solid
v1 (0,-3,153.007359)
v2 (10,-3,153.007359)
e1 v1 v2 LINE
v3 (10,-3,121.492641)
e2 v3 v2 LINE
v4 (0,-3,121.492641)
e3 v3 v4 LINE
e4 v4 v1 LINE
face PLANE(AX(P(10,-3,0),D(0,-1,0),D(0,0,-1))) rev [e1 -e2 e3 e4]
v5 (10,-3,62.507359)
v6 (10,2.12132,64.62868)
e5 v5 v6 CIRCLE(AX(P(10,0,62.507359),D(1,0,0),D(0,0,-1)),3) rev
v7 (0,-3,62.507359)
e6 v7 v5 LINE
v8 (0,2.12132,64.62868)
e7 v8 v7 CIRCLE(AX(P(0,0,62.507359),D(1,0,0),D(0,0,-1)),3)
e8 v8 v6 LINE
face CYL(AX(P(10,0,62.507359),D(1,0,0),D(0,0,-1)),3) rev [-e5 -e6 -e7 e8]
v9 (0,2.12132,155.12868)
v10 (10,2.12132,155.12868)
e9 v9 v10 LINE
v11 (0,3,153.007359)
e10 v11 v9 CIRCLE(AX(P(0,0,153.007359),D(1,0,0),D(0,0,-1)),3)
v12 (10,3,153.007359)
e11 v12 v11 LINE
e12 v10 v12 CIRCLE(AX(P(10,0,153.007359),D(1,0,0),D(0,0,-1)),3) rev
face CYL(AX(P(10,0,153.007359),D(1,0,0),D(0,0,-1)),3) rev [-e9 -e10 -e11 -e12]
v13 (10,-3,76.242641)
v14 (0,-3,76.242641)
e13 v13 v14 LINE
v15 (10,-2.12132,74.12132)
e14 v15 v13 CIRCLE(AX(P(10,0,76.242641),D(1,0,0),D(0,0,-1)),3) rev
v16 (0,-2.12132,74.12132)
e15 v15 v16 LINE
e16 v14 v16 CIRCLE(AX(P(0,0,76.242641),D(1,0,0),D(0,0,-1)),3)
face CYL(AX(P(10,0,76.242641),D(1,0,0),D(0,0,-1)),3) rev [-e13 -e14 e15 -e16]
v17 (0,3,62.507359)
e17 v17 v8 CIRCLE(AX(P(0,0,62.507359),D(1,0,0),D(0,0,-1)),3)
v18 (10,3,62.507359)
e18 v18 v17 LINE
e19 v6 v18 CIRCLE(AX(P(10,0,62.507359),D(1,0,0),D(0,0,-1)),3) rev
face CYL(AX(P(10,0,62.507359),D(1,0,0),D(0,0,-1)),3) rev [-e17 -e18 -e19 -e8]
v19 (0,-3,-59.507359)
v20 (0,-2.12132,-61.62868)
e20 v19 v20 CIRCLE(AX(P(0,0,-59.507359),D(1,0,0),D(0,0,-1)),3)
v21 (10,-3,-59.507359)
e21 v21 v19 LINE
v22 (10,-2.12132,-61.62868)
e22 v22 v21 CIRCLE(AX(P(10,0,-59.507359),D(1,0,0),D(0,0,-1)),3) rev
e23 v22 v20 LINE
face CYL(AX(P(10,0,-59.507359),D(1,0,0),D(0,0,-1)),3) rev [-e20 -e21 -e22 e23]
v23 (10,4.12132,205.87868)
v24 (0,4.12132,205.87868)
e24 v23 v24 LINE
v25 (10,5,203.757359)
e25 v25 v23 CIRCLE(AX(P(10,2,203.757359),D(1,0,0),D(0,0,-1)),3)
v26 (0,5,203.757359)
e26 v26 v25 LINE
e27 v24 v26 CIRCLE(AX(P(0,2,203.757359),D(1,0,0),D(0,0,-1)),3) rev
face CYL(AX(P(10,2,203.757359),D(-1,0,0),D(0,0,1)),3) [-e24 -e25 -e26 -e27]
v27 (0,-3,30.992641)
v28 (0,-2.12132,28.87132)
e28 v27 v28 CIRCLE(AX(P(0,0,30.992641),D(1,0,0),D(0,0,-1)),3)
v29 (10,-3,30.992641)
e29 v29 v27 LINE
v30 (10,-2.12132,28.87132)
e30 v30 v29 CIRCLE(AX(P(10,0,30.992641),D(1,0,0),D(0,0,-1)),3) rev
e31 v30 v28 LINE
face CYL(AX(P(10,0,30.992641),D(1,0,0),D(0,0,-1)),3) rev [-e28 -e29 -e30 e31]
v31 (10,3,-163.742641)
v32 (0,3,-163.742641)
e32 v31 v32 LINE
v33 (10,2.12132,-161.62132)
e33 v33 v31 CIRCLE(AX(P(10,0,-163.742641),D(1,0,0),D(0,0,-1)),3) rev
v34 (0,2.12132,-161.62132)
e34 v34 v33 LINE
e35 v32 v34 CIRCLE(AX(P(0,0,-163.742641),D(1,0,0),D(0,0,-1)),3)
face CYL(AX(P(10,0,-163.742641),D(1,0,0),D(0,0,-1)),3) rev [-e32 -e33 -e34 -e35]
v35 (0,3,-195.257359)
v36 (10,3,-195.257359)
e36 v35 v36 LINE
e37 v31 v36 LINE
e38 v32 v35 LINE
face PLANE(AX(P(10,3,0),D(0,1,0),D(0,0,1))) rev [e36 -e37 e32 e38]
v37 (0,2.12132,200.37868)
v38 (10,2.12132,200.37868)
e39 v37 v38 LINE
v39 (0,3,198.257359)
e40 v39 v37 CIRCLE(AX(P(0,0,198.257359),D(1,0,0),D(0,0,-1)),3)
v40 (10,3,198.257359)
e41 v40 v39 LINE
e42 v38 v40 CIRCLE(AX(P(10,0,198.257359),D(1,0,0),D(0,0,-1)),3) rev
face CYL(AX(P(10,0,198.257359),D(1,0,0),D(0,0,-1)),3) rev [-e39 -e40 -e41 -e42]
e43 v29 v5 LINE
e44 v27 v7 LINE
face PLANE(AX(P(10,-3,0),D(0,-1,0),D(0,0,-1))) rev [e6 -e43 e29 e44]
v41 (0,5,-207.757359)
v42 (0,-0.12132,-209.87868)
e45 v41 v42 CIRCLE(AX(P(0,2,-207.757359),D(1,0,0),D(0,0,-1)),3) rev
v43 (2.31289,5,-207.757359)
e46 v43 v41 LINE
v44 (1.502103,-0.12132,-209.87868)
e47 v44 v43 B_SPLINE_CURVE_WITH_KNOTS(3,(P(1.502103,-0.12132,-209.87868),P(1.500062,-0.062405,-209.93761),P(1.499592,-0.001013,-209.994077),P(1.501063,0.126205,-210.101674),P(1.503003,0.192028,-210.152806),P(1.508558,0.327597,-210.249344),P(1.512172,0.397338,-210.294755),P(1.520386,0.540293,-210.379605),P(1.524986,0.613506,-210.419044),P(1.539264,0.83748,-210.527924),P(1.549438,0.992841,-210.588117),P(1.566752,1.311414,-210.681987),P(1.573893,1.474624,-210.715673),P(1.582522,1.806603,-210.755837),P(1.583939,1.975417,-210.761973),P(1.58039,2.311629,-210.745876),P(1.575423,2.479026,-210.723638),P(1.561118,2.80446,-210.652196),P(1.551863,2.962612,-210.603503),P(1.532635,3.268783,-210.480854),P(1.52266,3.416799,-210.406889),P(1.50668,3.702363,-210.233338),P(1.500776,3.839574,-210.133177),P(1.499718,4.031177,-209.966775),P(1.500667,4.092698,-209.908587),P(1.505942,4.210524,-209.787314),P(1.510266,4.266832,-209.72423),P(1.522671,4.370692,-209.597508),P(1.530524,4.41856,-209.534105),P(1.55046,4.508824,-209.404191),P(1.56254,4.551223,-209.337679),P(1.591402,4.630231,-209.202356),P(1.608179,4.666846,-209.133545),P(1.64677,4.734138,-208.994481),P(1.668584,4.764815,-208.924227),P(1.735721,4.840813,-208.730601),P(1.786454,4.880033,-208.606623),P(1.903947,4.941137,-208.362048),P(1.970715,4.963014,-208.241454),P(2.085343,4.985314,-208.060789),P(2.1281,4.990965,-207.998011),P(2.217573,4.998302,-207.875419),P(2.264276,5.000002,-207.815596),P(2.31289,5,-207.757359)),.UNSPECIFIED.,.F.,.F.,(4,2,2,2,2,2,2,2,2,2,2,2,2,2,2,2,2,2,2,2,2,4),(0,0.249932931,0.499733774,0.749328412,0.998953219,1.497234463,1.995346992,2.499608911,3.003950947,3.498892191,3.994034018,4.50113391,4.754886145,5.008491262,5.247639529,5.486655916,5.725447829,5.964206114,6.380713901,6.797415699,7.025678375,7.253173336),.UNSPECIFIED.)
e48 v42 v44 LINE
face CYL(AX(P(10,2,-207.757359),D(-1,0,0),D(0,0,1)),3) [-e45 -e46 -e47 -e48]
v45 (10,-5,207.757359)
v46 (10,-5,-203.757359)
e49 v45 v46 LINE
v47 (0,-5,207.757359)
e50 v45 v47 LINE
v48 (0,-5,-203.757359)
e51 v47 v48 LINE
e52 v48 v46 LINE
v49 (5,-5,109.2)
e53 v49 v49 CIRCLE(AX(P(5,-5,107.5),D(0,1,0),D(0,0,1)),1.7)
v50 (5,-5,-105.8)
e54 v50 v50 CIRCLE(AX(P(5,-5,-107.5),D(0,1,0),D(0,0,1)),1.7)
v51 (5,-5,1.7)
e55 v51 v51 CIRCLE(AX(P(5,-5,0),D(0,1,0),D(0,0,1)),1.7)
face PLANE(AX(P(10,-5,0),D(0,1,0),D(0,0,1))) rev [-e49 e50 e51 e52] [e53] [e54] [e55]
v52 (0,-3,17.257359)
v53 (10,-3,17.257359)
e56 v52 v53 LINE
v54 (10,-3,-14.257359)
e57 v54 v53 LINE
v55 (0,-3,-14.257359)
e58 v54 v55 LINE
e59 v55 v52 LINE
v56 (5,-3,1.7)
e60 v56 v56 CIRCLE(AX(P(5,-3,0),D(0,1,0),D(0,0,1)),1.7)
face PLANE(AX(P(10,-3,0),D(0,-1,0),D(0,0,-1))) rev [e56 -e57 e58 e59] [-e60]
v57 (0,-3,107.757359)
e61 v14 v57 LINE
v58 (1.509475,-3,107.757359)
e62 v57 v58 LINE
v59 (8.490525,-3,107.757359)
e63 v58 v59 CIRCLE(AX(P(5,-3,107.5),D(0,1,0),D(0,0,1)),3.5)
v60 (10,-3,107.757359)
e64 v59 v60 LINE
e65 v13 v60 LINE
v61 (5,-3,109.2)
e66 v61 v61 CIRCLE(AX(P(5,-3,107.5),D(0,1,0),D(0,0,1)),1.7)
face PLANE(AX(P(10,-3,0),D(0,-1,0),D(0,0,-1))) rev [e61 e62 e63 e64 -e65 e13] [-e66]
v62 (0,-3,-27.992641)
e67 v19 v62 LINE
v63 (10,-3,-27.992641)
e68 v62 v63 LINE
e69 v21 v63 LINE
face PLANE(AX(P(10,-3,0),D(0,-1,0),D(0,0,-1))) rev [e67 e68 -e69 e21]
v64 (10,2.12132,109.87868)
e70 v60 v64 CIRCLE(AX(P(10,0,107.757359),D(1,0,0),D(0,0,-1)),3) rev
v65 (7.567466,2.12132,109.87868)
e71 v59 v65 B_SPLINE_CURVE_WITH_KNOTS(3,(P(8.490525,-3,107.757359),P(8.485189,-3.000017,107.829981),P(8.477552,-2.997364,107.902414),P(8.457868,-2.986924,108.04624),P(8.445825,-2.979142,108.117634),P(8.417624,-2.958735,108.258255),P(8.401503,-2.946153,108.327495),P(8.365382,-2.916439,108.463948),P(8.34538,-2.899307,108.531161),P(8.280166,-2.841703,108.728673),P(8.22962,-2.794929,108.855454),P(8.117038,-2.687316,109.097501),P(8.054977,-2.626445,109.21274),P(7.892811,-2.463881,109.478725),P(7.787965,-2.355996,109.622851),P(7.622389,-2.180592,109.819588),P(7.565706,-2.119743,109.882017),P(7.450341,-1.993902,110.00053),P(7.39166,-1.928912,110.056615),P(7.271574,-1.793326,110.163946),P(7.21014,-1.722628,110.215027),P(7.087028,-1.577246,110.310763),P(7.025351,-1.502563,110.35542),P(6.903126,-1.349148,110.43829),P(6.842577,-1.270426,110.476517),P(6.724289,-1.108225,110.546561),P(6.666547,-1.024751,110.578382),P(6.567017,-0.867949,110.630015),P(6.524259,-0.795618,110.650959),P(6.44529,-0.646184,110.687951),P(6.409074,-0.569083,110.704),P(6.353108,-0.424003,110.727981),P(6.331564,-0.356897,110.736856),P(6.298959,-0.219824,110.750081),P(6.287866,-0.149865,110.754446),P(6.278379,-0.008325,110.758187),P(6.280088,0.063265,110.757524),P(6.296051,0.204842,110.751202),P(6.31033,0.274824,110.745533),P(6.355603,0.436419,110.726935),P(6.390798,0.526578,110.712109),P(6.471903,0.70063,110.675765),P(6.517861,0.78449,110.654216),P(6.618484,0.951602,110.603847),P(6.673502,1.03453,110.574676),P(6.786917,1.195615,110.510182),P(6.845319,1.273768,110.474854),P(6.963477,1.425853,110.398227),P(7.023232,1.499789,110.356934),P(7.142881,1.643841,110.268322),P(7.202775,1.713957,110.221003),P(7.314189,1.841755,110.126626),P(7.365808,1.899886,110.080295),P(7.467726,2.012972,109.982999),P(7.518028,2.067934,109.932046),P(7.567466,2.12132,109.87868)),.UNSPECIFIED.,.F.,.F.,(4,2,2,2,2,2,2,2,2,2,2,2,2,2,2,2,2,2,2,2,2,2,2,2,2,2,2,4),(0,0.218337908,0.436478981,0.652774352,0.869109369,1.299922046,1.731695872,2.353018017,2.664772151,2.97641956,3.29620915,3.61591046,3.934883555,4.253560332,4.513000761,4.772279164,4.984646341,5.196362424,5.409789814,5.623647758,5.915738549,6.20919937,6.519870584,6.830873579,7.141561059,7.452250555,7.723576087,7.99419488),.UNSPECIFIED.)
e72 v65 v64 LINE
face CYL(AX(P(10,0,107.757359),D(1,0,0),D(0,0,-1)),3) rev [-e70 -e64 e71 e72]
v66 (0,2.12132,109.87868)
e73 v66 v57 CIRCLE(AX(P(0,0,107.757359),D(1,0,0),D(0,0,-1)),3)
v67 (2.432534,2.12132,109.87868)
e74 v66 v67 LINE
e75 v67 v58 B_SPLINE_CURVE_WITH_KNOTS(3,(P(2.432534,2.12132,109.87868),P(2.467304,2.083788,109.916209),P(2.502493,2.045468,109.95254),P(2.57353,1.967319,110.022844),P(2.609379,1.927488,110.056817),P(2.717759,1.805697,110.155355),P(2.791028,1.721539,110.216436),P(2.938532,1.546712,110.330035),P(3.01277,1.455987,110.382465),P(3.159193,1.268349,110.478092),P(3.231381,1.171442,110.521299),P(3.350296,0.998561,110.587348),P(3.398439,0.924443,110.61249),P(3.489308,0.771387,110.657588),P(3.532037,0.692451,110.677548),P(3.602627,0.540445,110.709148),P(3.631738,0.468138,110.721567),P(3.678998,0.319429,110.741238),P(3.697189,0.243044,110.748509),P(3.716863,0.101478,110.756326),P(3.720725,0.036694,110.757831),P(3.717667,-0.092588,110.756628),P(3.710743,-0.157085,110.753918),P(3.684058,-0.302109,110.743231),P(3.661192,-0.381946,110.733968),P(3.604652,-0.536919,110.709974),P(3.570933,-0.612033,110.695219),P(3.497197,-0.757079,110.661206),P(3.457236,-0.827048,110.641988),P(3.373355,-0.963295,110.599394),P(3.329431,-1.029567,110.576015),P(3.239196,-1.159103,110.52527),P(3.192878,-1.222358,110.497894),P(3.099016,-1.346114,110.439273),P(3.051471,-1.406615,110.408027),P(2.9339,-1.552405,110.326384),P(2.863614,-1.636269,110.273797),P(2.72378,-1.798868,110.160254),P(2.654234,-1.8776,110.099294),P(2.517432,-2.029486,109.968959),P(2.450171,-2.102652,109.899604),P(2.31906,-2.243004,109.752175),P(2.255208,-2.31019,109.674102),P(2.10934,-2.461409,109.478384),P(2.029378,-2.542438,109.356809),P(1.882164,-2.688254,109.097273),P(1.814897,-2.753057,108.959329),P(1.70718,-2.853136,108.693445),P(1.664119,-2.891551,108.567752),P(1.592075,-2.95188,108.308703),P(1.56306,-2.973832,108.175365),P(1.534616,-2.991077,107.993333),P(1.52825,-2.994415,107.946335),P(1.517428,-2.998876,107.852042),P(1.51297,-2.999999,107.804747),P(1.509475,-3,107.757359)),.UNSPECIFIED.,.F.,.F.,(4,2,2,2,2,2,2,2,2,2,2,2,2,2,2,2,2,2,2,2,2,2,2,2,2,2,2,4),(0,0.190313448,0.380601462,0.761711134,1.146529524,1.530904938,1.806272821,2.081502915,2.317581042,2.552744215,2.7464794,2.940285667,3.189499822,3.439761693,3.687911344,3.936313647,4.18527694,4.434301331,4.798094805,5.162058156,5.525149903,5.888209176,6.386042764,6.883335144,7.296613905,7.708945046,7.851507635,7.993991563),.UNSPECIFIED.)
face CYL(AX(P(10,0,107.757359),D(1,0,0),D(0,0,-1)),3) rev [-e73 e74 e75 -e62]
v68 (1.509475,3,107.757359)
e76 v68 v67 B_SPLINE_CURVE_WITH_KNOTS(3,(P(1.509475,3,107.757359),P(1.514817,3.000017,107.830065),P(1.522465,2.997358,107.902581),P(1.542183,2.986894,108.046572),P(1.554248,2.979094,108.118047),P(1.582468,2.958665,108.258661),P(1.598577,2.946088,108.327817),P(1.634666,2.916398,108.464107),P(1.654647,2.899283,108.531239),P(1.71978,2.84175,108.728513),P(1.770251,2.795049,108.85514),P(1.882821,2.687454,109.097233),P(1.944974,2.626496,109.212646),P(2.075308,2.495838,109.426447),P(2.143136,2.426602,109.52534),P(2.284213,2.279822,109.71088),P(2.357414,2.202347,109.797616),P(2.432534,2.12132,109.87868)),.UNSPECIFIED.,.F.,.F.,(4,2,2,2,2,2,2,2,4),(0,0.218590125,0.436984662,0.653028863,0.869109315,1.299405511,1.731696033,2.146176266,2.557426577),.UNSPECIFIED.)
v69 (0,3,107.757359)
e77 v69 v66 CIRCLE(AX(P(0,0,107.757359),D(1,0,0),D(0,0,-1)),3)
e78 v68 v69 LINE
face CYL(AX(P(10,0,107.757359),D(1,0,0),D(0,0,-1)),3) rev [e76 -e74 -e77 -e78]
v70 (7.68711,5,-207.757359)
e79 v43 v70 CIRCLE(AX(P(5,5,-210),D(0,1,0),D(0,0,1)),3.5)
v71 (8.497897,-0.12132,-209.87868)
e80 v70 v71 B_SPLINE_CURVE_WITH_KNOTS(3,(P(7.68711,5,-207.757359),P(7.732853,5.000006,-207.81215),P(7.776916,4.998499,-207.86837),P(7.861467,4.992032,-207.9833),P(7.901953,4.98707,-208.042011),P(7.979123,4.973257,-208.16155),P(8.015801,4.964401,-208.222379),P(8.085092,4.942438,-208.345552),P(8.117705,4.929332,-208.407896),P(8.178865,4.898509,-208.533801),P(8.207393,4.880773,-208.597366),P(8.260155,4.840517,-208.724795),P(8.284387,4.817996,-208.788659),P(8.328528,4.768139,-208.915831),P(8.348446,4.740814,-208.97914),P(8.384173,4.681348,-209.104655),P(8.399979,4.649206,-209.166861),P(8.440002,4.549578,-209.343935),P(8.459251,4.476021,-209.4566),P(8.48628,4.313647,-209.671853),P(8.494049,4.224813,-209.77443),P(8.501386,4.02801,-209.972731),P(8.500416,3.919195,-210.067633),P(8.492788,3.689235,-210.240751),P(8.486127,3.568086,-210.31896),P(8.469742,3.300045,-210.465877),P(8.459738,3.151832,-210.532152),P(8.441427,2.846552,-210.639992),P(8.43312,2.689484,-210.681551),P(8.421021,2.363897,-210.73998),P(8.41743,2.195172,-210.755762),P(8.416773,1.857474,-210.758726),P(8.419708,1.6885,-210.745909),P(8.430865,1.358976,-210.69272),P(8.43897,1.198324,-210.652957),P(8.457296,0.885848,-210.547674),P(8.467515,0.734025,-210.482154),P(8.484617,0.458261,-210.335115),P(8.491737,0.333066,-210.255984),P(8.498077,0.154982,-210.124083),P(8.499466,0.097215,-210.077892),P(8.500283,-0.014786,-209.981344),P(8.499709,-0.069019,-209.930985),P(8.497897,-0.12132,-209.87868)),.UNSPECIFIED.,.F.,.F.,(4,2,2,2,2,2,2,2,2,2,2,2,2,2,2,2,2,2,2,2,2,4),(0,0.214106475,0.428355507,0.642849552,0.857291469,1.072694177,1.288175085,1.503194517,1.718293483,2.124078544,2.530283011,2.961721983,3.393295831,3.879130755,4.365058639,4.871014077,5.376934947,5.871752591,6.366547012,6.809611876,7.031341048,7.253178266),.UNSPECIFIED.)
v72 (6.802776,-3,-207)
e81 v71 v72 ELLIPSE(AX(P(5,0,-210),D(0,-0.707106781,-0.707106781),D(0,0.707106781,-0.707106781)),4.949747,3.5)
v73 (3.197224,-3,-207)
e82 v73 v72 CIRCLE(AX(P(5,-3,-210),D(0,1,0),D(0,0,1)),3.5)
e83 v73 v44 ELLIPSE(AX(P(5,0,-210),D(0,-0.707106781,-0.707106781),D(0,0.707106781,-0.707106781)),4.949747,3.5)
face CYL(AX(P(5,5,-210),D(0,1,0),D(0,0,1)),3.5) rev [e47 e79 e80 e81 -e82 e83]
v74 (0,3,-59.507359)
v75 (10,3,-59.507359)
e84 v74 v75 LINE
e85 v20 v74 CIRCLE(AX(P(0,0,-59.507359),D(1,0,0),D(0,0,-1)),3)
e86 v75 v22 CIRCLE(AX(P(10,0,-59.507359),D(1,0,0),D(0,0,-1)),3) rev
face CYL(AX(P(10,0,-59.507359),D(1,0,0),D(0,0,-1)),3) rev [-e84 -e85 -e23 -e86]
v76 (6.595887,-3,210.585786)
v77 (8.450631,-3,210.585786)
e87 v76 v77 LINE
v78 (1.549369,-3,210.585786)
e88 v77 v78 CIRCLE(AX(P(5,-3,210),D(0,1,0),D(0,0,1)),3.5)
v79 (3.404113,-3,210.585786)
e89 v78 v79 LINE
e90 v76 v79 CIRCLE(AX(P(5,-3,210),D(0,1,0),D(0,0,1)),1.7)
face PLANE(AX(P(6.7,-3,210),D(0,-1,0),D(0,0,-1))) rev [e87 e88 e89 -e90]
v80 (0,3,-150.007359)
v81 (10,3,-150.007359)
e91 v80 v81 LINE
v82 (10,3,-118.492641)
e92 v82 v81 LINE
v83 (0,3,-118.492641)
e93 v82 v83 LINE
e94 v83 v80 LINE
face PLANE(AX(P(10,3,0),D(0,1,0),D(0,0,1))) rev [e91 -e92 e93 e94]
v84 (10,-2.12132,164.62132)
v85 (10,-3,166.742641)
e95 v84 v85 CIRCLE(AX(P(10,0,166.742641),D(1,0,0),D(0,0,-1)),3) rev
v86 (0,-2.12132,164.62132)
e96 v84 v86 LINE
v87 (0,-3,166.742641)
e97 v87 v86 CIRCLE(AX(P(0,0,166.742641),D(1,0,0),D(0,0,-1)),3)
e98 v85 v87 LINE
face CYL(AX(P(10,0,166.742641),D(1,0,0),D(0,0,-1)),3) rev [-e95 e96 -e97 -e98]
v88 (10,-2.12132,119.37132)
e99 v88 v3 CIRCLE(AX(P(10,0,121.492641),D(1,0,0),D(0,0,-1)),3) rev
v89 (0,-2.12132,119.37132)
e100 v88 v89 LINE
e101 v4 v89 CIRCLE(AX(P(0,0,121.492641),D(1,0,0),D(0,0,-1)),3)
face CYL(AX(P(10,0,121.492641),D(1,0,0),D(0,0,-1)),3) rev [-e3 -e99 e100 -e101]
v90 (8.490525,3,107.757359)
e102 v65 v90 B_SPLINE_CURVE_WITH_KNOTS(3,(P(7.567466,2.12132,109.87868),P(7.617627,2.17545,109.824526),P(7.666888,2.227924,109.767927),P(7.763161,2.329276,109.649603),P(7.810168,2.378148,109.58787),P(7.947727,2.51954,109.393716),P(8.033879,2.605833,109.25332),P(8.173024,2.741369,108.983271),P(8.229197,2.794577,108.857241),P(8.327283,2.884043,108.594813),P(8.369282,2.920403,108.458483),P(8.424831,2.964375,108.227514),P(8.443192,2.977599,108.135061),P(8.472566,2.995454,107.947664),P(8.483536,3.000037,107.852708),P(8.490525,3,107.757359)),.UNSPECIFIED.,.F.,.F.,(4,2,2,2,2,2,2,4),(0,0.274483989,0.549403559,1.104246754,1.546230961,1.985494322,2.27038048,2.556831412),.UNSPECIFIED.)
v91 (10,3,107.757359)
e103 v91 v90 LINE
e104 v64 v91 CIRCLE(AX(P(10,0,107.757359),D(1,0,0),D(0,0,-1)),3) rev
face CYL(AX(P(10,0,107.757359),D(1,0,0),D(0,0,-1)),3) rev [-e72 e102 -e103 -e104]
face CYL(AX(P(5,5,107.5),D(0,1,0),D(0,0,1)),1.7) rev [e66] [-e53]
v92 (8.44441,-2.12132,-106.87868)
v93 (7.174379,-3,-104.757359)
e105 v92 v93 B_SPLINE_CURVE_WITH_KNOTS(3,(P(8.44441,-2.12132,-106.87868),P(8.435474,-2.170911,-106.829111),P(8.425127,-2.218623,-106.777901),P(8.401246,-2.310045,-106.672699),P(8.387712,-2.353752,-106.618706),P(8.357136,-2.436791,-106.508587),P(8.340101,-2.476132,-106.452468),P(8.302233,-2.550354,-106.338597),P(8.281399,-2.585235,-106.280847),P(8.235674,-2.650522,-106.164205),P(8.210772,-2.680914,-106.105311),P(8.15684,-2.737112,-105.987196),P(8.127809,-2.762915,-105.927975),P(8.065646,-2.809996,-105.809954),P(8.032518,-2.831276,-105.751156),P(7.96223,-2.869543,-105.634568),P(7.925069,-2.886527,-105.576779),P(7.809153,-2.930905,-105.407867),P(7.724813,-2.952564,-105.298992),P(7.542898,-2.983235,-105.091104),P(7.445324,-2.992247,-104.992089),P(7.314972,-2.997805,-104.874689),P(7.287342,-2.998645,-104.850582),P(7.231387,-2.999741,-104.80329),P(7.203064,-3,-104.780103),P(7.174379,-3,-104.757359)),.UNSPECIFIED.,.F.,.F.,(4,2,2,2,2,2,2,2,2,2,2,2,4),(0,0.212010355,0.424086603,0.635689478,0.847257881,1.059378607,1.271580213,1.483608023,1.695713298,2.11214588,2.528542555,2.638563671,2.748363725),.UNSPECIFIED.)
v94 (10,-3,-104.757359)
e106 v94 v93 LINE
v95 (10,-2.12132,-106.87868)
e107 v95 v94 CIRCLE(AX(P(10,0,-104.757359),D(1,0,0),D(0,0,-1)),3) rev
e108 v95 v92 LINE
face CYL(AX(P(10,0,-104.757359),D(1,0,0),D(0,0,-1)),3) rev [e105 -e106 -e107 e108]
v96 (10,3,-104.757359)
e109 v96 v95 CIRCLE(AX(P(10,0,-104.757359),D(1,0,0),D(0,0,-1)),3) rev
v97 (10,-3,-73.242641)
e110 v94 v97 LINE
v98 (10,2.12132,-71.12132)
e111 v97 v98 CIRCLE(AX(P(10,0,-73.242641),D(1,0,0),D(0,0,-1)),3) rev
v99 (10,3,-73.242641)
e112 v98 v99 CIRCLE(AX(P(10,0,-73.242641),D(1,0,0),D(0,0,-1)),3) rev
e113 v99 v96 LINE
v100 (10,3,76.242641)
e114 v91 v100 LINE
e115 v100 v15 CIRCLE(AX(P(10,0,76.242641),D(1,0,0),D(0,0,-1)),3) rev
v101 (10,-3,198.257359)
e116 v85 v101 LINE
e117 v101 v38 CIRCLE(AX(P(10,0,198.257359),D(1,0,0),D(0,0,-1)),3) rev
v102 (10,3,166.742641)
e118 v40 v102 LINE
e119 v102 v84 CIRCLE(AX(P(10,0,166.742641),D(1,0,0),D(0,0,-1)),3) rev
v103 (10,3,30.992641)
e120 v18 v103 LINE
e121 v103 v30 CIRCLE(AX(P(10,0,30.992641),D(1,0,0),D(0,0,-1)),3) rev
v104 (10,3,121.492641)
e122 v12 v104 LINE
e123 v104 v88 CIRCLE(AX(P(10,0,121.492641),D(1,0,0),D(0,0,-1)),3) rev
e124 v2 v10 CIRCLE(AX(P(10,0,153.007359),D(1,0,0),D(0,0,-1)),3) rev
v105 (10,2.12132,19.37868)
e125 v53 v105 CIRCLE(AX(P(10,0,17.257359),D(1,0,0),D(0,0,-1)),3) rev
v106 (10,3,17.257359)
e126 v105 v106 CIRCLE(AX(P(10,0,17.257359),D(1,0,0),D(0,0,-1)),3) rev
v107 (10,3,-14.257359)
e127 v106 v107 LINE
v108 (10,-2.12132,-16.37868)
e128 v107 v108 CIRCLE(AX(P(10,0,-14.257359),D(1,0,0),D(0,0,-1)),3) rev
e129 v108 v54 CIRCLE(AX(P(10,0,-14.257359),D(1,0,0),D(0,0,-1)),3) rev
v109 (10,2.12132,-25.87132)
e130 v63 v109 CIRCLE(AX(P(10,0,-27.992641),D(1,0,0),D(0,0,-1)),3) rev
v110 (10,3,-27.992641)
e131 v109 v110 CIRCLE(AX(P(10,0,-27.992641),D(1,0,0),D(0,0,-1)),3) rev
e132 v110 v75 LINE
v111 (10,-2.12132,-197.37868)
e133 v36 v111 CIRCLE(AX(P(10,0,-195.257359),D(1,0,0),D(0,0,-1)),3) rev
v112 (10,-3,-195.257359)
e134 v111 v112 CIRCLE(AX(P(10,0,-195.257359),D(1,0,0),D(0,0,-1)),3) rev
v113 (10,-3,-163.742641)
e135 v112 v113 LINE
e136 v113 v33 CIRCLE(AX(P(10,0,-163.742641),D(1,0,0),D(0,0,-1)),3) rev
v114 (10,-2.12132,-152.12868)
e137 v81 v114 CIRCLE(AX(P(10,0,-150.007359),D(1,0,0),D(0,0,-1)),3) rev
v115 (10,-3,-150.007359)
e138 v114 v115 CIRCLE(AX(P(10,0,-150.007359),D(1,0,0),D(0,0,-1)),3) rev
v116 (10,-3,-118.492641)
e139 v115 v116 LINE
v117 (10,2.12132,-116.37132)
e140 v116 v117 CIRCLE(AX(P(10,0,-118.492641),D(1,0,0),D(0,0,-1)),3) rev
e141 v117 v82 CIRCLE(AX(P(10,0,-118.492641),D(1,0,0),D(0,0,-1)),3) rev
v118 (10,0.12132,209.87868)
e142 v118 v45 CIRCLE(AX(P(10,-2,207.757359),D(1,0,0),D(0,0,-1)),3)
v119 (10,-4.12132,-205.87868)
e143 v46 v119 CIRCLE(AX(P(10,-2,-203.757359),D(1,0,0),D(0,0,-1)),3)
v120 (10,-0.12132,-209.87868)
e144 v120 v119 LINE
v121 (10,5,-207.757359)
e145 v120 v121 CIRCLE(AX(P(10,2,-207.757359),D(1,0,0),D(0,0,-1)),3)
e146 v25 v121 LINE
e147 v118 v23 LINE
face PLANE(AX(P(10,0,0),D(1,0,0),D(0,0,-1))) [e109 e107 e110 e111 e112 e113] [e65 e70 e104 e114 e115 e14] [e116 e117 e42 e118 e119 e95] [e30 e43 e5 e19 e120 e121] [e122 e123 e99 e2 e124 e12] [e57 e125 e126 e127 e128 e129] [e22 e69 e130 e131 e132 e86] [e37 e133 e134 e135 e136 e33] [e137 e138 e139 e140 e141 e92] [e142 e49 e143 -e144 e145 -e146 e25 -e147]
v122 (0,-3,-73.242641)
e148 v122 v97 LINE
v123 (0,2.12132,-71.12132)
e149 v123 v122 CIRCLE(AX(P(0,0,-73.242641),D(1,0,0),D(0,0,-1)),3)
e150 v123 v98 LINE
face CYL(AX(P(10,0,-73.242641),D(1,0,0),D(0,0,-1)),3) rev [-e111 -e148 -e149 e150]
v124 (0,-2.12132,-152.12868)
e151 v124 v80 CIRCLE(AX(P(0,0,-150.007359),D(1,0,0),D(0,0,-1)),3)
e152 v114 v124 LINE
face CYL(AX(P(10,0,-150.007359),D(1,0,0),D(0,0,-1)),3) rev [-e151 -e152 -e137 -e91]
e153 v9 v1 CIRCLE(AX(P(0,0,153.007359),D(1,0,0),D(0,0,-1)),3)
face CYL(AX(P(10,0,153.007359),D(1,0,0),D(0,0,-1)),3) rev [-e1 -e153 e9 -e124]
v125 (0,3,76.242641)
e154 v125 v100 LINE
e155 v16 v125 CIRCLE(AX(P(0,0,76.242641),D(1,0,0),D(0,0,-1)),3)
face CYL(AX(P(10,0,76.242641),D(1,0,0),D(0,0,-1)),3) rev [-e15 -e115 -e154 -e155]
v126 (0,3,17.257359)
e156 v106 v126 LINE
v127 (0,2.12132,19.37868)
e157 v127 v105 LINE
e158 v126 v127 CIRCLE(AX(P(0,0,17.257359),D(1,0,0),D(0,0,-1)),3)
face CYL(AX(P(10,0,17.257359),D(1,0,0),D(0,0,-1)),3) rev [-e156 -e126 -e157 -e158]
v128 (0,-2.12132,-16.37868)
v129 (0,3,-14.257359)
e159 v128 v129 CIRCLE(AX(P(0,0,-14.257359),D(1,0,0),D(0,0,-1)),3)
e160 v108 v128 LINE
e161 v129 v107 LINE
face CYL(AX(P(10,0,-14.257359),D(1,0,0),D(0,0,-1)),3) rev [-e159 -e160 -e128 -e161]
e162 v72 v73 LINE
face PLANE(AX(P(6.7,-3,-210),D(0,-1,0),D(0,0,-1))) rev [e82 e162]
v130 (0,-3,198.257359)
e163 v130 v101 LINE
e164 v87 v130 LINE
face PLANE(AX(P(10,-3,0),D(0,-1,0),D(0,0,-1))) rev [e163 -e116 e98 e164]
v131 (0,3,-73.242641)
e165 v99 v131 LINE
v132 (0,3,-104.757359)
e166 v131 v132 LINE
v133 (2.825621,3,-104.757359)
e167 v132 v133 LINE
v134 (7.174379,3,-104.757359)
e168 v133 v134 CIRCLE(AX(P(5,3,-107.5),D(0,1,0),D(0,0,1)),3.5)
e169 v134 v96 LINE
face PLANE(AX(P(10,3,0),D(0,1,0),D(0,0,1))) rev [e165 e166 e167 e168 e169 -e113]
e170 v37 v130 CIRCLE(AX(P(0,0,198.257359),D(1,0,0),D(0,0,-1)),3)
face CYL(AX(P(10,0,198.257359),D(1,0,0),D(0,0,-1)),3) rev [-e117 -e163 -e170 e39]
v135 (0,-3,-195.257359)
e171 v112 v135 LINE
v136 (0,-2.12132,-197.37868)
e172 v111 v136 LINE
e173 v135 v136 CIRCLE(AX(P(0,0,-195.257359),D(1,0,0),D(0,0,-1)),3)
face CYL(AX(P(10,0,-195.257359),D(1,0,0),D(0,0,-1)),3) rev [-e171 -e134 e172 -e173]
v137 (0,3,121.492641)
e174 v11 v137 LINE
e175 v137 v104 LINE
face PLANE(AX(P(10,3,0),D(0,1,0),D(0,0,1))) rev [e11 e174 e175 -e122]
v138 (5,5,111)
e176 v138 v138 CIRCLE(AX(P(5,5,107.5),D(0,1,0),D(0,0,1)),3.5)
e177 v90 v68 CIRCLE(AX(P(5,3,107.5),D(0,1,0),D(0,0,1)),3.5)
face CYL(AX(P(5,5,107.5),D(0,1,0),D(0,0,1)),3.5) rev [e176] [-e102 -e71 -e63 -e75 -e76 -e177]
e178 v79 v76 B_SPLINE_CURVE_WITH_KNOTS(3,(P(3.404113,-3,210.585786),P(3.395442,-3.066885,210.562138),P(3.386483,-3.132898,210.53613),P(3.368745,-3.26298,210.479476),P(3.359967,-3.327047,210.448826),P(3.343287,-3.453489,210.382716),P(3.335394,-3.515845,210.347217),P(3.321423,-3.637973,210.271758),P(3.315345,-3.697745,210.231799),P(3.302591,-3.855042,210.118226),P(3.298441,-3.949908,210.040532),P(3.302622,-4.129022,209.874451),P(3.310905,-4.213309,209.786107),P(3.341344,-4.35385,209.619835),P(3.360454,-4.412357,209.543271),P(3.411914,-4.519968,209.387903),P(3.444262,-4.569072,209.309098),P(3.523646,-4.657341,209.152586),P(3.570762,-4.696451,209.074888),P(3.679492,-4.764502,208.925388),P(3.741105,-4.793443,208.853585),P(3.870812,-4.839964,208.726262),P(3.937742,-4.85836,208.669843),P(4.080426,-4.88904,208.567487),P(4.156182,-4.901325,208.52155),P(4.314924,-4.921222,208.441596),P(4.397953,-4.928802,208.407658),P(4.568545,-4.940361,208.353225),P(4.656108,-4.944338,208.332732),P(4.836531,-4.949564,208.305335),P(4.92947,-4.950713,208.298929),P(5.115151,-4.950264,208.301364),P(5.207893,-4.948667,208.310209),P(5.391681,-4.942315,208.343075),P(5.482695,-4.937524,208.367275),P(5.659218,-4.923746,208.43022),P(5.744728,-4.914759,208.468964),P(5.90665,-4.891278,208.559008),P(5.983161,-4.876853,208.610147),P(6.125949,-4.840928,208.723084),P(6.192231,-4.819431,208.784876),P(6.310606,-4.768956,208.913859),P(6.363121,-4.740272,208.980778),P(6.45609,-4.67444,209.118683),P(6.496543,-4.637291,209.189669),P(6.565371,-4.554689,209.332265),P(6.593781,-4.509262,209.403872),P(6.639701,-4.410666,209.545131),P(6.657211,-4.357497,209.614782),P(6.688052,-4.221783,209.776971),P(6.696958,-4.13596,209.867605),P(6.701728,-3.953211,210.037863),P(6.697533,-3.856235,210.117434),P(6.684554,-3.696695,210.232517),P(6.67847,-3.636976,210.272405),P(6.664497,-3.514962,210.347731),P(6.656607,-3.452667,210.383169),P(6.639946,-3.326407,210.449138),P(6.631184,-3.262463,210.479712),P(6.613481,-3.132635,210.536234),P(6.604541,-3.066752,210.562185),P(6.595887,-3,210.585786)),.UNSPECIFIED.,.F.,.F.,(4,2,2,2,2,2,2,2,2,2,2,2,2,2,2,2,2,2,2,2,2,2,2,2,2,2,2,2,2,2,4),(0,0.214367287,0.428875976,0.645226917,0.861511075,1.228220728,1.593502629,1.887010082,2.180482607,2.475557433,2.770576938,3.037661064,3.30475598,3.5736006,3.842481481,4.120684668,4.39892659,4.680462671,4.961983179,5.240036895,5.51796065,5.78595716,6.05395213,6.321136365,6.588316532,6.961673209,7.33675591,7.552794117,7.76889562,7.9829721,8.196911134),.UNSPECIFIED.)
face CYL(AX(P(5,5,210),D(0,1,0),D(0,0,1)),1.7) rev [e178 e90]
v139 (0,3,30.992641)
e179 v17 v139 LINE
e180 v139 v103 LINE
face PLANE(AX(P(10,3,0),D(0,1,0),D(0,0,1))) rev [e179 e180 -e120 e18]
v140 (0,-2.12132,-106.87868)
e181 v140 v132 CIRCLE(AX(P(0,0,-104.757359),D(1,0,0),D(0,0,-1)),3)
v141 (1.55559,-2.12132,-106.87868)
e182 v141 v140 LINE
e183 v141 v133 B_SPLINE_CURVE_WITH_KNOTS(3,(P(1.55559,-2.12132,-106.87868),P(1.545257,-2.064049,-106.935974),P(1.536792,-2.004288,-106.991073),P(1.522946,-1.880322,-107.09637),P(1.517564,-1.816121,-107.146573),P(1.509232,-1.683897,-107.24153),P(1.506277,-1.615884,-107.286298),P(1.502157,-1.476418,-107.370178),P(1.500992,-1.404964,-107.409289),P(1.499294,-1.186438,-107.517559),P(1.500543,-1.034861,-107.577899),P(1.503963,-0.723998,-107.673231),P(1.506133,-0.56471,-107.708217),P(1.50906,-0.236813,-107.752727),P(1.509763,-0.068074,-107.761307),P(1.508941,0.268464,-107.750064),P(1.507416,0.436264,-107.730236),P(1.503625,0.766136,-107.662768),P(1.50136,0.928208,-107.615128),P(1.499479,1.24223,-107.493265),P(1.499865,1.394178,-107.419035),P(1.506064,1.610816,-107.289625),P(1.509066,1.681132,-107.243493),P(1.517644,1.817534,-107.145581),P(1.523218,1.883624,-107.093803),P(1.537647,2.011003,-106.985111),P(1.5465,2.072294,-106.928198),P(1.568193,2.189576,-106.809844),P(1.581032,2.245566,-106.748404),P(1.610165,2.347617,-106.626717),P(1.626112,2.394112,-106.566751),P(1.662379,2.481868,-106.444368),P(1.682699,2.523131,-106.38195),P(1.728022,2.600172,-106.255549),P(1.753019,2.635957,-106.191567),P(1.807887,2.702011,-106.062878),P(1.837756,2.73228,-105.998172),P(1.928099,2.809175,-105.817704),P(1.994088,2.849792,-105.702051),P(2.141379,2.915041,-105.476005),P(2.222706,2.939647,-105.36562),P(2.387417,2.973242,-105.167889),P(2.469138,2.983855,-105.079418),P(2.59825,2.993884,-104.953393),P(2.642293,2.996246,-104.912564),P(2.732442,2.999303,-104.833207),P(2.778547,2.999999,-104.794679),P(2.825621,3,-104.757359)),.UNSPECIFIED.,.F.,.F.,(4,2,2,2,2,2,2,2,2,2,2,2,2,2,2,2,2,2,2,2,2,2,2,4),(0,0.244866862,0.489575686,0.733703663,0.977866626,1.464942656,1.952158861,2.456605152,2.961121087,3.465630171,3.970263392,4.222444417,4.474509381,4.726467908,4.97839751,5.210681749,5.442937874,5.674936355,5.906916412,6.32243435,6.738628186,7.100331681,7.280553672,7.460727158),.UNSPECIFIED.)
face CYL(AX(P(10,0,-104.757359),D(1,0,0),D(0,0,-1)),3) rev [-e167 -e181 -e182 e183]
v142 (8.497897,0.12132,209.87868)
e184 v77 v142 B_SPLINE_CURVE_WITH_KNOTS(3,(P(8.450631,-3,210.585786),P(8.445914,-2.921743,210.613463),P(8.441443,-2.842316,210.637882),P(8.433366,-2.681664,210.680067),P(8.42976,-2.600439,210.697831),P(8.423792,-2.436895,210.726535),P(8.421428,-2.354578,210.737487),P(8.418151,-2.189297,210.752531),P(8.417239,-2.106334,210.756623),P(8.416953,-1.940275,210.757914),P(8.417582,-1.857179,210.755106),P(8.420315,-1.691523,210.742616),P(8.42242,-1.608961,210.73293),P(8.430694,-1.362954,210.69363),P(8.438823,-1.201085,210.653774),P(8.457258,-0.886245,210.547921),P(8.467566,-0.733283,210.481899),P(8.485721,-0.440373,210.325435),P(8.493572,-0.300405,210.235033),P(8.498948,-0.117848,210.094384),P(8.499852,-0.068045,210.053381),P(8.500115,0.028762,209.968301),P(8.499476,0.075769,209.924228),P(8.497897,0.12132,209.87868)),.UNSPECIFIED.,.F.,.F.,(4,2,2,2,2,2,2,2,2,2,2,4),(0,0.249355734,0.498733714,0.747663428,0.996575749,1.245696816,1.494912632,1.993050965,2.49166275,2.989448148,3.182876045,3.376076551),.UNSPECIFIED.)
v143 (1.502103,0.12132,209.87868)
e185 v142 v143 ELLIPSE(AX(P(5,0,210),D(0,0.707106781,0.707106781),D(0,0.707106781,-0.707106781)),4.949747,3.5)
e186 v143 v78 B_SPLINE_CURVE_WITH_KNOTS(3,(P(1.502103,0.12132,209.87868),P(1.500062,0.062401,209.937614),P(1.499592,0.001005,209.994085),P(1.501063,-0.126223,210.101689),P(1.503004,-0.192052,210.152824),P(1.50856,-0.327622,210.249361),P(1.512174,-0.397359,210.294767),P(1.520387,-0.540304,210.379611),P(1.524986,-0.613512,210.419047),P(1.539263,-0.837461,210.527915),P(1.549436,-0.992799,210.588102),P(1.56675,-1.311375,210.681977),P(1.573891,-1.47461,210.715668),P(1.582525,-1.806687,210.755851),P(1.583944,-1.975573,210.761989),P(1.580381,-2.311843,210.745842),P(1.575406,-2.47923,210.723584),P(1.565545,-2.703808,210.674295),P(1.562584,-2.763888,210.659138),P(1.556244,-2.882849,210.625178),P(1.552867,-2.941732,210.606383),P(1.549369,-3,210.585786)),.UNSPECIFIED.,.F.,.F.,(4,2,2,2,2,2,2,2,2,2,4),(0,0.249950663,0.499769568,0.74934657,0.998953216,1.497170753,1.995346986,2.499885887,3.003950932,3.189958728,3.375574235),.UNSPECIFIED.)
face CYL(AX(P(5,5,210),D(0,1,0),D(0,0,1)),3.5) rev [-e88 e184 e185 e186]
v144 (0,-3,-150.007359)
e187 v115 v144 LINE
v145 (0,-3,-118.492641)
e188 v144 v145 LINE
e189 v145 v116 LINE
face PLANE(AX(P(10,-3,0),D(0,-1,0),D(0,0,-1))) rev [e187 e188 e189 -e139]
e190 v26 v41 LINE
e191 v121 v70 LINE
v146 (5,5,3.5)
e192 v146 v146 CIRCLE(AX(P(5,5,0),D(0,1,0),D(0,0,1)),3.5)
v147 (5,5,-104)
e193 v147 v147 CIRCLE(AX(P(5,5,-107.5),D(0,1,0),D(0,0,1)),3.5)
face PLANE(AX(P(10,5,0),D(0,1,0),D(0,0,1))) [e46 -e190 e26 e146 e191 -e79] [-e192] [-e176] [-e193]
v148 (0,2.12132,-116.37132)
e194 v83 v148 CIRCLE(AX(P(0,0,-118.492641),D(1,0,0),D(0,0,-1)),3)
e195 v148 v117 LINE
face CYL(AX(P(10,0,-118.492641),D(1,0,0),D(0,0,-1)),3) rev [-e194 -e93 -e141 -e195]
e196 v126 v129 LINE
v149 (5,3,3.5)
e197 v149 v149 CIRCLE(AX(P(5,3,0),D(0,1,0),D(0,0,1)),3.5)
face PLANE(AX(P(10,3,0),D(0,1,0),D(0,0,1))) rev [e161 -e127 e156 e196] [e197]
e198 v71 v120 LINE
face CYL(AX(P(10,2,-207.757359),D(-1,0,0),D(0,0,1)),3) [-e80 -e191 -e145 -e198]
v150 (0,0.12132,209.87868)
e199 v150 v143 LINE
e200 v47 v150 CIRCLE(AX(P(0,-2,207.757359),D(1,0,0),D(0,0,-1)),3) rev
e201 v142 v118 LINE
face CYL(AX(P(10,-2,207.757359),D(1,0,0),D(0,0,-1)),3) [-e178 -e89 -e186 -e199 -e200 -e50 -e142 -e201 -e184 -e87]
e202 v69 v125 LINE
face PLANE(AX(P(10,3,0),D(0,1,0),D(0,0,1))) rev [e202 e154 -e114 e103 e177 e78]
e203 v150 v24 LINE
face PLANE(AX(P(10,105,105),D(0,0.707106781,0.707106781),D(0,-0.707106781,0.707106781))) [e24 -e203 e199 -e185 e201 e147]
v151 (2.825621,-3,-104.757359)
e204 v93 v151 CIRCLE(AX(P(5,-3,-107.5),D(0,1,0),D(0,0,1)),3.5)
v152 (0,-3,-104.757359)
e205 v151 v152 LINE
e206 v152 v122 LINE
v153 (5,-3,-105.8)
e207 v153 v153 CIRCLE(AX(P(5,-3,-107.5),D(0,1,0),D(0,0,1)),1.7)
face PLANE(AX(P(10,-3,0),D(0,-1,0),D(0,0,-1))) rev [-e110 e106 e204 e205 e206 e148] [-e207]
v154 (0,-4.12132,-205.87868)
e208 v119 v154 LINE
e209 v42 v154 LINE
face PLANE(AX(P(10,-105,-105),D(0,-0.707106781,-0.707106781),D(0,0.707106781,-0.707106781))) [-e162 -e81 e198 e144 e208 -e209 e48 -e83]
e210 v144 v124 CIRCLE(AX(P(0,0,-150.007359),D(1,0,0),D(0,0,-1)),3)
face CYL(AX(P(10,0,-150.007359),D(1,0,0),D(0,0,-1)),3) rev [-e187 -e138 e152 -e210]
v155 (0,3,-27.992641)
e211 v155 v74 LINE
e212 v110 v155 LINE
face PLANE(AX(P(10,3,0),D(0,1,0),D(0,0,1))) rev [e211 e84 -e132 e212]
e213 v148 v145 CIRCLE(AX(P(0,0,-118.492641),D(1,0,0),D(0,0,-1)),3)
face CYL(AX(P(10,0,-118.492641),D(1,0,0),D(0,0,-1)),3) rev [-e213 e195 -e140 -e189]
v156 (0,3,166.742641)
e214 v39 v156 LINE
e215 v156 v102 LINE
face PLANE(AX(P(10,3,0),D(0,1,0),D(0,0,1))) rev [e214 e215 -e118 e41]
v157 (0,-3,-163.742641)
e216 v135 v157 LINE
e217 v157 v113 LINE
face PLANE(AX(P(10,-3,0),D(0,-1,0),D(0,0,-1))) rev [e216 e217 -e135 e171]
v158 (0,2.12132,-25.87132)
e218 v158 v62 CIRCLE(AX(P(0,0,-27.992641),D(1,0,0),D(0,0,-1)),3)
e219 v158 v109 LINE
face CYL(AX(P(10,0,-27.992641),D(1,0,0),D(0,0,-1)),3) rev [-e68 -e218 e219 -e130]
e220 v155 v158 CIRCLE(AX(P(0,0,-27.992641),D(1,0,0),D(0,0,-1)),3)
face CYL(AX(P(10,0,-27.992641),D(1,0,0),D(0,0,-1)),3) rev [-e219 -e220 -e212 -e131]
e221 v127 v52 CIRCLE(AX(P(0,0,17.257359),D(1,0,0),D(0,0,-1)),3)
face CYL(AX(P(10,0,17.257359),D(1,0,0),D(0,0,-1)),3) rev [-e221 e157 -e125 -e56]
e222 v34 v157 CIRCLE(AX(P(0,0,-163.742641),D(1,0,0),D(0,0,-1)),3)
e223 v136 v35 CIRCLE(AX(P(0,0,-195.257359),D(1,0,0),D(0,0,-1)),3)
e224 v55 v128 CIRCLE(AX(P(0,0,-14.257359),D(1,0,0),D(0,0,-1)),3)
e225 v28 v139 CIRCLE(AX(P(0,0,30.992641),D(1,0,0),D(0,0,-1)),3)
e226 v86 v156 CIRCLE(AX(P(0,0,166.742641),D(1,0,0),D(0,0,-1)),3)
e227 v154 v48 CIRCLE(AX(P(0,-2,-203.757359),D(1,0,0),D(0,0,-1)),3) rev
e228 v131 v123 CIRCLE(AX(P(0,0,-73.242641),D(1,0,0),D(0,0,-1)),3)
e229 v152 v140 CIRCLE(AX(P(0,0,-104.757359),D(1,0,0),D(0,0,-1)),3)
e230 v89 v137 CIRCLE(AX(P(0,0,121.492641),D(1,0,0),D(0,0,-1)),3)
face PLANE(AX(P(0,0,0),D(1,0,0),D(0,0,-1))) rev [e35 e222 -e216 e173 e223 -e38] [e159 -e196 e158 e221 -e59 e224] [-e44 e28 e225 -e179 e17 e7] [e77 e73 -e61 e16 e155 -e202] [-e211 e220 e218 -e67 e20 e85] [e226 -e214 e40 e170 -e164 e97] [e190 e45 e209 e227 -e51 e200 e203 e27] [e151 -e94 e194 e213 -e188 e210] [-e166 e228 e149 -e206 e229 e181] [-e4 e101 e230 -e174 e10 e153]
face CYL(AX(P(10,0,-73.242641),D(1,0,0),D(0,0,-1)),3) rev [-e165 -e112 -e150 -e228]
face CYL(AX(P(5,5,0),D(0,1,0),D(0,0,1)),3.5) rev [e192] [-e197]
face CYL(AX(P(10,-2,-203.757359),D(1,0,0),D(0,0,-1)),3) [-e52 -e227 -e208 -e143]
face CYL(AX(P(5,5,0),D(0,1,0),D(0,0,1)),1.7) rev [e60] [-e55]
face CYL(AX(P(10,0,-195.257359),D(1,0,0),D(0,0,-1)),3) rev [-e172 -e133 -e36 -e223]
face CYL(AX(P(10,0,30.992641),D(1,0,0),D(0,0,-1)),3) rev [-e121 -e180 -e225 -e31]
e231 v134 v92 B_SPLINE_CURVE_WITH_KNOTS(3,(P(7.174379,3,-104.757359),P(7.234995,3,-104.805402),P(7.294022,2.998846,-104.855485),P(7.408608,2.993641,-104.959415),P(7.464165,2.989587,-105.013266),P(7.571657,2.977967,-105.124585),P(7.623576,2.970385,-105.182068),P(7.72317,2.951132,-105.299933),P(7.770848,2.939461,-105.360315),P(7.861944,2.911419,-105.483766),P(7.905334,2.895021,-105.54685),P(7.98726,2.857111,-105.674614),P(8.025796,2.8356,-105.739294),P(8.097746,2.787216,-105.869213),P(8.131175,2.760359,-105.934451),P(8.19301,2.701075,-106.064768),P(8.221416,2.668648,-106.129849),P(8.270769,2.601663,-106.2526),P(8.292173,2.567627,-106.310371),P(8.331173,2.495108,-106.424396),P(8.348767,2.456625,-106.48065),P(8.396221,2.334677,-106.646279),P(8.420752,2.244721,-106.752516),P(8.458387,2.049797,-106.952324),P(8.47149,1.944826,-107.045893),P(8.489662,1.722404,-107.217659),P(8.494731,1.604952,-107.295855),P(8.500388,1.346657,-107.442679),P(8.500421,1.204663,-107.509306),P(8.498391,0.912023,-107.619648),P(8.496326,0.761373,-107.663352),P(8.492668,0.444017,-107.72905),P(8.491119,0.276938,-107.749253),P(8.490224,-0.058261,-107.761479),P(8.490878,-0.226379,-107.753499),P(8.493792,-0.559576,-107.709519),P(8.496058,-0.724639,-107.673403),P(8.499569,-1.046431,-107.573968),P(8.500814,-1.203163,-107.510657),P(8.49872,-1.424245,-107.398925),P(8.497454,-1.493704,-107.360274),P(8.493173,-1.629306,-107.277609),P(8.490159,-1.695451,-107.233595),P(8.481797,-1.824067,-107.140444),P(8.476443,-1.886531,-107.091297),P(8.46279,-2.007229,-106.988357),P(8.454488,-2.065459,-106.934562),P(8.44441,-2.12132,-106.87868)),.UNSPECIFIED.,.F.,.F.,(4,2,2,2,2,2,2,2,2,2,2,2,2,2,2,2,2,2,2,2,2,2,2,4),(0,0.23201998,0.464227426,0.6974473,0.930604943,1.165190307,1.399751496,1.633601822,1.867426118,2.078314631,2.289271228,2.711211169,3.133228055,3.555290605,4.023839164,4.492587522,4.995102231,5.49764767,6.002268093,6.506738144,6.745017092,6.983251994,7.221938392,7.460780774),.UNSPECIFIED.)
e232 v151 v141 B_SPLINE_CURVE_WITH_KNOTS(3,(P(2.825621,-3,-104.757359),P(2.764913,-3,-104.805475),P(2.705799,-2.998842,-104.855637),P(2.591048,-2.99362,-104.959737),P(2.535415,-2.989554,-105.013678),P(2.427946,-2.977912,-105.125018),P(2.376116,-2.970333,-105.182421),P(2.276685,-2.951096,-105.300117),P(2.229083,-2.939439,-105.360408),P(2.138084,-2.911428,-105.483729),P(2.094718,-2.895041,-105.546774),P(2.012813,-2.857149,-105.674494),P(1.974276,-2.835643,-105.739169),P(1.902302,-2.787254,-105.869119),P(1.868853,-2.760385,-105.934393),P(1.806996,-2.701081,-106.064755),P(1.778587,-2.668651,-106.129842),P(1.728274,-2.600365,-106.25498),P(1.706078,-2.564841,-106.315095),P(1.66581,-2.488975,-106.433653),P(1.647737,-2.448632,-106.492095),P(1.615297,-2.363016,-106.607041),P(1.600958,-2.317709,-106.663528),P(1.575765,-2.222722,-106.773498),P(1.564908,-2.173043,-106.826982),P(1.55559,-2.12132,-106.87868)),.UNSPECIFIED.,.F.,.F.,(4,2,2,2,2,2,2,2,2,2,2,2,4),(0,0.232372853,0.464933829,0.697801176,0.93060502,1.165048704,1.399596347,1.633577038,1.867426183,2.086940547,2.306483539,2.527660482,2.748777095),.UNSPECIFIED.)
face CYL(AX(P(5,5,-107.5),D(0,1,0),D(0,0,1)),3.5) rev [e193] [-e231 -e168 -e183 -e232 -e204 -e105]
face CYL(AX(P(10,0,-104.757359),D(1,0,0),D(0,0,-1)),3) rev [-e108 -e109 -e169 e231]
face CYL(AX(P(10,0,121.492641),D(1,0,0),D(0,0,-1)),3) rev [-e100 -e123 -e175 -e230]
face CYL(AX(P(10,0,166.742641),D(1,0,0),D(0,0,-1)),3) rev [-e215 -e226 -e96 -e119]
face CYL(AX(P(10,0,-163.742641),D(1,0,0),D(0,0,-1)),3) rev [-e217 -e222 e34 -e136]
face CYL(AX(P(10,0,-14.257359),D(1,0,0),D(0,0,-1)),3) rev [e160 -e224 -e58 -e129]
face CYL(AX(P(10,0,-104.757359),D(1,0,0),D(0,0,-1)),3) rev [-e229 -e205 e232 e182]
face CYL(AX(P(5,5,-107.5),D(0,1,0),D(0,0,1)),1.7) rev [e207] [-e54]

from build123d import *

# Parameters (mm, degrees)
BOSS_EXTRUDE1_DEPTH                          = 10
FILLET1_R                                    = 3
CBORE_FOR_M3_HEX_HEAD_CAP_SCREW1_D           = 3.4
CBORE_FOR_M3_HEX_HEAD_CAP_SCREW1_CBORE_D     = 7
CBORE_FOR_M3_HEX_HEAD_CAP_SCREW1_CBORE_DEPTH = 8


with BuildPart() as part:
    # Sketch1 → Boss-Extrude1 (new body)
    with BuildSketch(Plane(origin=(0, 0, 0), x_dir=(0, 0, -1), z_dir=(1, 0, 0))):
        Polygon((215, 5), (-205, 5), (-215, -5), (205, -5), align=None)
        Polygon((-165.5, -3), (-205.5, -3), (-199.5, 3), (-159.5, 3), align=None, mode=Mode.SUBTRACT)
        Polygon((-160.25, -3), (-154.25, 3), (-114.25, 3), (-120.25, -3), align=None, mode=Mode.SUBTRACT)
        Polygon((-115, -3), (-109, 3), (-69, 3), (-75, -3), align=None, mode=Mode.SUBTRACT)
        Polygon((-69.75, -3), (-63.75, 3), (-23.75, 3), (-29.75, -3), align=None, mode=Mode.SUBTRACT)
        Polygon((-24.5, -3), (-18.5, 3), (21.5, 3), (15.5, -3), align=None, mode=Mode.SUBTRACT)
        Polygon((20.75, -3), (26.75, 3), (66.75, 3), (60.75, -3), align=None, mode=Mode.SUBTRACT)
        Polygon((66, -3), (72, 3), (112, 3), (106, -3), align=None, mode=Mode.SUBTRACT)
        Polygon((111.25, -3), (117.25, 3), (157.25, 3), (151.25, -3), align=None, mode=Mode.SUBTRACT)
        Polygon((156.5, -3), (162.5, 3), (202.5, 3), (196.5, -3), align=None, mode=Mode.SUBTRACT)
    extrude(amount=BOSS_EXTRUDE1_DEPTH)

    # Fillet1
    fillet1_edges = [part.edges().sort_by_distance(p)[0] for p in [
        (5, -5, 215),
        (5, 5, 205),
        (5, -5, -205),
        (5, 5, -215),
        (5, -3, -156.5),
        (5, -3, -151.25),
        (5, 3, -162.5),
        (5, 3, -157.25),
        (5, -3, -106),
        (5, -3, -111.25),
        (5, 3, -112),
        (5, 3, -117.25),
        (5, -3, -66),
        (5, -3, -60.75),
        (5, 3, -72),
        (5, 3, -66.75),
        (5, -3, -15.5),
        (5, -3, -20.75),
        (5, 3, -21.5),
        (5, 3, -26.75),
        (5, -3, 24.5),
        (5, -3, 29.75),
        (5, 3, 18.5),
        (5, 3, 23.75),
        (5, -3, 75),
        (5, -3, 69.75),
        (5, 3, 69),
        (5, 3, 63.75),
        (5, -3, 115),
        (5, -3, 120.25),
        (5, 3, 109),
        (5, 3, 114.25),
        (5, -3, 160.25),
        (5, 3, 159.5),
        (5, 3, 154.25),
        (5, -3, 205.5),
        (5, 3, 199.5),
        (5, -3, -196.5),
        (5, 3, -202.5),
        (5, -3, 165.5),
    ]]
    fillet(fillet1_edges, radius=FILLET1_R - 0.0001)  # a hair under: the kernel refuses the full size

    # CBORE for M3 Hex Head Cap Screw1 (through all)
    with Locations(Plane(origin=(0, 5, 0), x_dir=(1, 0, 0), z_dir=(0, 1, 0))):
        with Locations((5, -210), (5, 0), (5, -107.5), (5, 107.5), (5, 210)):
            CounterBoreHole(CBORE_FOR_M3_HEX_HEAD_CAP_SCREW1_D / 2, CBORE_FOR_M3_HEX_HEAD_CAP_SCREW1_CBORE_D / 2, CBORE_FOR_M3_HEX_HEAD_CAP_SCREW1_CBORE_DEPTH)


solid = part.part
